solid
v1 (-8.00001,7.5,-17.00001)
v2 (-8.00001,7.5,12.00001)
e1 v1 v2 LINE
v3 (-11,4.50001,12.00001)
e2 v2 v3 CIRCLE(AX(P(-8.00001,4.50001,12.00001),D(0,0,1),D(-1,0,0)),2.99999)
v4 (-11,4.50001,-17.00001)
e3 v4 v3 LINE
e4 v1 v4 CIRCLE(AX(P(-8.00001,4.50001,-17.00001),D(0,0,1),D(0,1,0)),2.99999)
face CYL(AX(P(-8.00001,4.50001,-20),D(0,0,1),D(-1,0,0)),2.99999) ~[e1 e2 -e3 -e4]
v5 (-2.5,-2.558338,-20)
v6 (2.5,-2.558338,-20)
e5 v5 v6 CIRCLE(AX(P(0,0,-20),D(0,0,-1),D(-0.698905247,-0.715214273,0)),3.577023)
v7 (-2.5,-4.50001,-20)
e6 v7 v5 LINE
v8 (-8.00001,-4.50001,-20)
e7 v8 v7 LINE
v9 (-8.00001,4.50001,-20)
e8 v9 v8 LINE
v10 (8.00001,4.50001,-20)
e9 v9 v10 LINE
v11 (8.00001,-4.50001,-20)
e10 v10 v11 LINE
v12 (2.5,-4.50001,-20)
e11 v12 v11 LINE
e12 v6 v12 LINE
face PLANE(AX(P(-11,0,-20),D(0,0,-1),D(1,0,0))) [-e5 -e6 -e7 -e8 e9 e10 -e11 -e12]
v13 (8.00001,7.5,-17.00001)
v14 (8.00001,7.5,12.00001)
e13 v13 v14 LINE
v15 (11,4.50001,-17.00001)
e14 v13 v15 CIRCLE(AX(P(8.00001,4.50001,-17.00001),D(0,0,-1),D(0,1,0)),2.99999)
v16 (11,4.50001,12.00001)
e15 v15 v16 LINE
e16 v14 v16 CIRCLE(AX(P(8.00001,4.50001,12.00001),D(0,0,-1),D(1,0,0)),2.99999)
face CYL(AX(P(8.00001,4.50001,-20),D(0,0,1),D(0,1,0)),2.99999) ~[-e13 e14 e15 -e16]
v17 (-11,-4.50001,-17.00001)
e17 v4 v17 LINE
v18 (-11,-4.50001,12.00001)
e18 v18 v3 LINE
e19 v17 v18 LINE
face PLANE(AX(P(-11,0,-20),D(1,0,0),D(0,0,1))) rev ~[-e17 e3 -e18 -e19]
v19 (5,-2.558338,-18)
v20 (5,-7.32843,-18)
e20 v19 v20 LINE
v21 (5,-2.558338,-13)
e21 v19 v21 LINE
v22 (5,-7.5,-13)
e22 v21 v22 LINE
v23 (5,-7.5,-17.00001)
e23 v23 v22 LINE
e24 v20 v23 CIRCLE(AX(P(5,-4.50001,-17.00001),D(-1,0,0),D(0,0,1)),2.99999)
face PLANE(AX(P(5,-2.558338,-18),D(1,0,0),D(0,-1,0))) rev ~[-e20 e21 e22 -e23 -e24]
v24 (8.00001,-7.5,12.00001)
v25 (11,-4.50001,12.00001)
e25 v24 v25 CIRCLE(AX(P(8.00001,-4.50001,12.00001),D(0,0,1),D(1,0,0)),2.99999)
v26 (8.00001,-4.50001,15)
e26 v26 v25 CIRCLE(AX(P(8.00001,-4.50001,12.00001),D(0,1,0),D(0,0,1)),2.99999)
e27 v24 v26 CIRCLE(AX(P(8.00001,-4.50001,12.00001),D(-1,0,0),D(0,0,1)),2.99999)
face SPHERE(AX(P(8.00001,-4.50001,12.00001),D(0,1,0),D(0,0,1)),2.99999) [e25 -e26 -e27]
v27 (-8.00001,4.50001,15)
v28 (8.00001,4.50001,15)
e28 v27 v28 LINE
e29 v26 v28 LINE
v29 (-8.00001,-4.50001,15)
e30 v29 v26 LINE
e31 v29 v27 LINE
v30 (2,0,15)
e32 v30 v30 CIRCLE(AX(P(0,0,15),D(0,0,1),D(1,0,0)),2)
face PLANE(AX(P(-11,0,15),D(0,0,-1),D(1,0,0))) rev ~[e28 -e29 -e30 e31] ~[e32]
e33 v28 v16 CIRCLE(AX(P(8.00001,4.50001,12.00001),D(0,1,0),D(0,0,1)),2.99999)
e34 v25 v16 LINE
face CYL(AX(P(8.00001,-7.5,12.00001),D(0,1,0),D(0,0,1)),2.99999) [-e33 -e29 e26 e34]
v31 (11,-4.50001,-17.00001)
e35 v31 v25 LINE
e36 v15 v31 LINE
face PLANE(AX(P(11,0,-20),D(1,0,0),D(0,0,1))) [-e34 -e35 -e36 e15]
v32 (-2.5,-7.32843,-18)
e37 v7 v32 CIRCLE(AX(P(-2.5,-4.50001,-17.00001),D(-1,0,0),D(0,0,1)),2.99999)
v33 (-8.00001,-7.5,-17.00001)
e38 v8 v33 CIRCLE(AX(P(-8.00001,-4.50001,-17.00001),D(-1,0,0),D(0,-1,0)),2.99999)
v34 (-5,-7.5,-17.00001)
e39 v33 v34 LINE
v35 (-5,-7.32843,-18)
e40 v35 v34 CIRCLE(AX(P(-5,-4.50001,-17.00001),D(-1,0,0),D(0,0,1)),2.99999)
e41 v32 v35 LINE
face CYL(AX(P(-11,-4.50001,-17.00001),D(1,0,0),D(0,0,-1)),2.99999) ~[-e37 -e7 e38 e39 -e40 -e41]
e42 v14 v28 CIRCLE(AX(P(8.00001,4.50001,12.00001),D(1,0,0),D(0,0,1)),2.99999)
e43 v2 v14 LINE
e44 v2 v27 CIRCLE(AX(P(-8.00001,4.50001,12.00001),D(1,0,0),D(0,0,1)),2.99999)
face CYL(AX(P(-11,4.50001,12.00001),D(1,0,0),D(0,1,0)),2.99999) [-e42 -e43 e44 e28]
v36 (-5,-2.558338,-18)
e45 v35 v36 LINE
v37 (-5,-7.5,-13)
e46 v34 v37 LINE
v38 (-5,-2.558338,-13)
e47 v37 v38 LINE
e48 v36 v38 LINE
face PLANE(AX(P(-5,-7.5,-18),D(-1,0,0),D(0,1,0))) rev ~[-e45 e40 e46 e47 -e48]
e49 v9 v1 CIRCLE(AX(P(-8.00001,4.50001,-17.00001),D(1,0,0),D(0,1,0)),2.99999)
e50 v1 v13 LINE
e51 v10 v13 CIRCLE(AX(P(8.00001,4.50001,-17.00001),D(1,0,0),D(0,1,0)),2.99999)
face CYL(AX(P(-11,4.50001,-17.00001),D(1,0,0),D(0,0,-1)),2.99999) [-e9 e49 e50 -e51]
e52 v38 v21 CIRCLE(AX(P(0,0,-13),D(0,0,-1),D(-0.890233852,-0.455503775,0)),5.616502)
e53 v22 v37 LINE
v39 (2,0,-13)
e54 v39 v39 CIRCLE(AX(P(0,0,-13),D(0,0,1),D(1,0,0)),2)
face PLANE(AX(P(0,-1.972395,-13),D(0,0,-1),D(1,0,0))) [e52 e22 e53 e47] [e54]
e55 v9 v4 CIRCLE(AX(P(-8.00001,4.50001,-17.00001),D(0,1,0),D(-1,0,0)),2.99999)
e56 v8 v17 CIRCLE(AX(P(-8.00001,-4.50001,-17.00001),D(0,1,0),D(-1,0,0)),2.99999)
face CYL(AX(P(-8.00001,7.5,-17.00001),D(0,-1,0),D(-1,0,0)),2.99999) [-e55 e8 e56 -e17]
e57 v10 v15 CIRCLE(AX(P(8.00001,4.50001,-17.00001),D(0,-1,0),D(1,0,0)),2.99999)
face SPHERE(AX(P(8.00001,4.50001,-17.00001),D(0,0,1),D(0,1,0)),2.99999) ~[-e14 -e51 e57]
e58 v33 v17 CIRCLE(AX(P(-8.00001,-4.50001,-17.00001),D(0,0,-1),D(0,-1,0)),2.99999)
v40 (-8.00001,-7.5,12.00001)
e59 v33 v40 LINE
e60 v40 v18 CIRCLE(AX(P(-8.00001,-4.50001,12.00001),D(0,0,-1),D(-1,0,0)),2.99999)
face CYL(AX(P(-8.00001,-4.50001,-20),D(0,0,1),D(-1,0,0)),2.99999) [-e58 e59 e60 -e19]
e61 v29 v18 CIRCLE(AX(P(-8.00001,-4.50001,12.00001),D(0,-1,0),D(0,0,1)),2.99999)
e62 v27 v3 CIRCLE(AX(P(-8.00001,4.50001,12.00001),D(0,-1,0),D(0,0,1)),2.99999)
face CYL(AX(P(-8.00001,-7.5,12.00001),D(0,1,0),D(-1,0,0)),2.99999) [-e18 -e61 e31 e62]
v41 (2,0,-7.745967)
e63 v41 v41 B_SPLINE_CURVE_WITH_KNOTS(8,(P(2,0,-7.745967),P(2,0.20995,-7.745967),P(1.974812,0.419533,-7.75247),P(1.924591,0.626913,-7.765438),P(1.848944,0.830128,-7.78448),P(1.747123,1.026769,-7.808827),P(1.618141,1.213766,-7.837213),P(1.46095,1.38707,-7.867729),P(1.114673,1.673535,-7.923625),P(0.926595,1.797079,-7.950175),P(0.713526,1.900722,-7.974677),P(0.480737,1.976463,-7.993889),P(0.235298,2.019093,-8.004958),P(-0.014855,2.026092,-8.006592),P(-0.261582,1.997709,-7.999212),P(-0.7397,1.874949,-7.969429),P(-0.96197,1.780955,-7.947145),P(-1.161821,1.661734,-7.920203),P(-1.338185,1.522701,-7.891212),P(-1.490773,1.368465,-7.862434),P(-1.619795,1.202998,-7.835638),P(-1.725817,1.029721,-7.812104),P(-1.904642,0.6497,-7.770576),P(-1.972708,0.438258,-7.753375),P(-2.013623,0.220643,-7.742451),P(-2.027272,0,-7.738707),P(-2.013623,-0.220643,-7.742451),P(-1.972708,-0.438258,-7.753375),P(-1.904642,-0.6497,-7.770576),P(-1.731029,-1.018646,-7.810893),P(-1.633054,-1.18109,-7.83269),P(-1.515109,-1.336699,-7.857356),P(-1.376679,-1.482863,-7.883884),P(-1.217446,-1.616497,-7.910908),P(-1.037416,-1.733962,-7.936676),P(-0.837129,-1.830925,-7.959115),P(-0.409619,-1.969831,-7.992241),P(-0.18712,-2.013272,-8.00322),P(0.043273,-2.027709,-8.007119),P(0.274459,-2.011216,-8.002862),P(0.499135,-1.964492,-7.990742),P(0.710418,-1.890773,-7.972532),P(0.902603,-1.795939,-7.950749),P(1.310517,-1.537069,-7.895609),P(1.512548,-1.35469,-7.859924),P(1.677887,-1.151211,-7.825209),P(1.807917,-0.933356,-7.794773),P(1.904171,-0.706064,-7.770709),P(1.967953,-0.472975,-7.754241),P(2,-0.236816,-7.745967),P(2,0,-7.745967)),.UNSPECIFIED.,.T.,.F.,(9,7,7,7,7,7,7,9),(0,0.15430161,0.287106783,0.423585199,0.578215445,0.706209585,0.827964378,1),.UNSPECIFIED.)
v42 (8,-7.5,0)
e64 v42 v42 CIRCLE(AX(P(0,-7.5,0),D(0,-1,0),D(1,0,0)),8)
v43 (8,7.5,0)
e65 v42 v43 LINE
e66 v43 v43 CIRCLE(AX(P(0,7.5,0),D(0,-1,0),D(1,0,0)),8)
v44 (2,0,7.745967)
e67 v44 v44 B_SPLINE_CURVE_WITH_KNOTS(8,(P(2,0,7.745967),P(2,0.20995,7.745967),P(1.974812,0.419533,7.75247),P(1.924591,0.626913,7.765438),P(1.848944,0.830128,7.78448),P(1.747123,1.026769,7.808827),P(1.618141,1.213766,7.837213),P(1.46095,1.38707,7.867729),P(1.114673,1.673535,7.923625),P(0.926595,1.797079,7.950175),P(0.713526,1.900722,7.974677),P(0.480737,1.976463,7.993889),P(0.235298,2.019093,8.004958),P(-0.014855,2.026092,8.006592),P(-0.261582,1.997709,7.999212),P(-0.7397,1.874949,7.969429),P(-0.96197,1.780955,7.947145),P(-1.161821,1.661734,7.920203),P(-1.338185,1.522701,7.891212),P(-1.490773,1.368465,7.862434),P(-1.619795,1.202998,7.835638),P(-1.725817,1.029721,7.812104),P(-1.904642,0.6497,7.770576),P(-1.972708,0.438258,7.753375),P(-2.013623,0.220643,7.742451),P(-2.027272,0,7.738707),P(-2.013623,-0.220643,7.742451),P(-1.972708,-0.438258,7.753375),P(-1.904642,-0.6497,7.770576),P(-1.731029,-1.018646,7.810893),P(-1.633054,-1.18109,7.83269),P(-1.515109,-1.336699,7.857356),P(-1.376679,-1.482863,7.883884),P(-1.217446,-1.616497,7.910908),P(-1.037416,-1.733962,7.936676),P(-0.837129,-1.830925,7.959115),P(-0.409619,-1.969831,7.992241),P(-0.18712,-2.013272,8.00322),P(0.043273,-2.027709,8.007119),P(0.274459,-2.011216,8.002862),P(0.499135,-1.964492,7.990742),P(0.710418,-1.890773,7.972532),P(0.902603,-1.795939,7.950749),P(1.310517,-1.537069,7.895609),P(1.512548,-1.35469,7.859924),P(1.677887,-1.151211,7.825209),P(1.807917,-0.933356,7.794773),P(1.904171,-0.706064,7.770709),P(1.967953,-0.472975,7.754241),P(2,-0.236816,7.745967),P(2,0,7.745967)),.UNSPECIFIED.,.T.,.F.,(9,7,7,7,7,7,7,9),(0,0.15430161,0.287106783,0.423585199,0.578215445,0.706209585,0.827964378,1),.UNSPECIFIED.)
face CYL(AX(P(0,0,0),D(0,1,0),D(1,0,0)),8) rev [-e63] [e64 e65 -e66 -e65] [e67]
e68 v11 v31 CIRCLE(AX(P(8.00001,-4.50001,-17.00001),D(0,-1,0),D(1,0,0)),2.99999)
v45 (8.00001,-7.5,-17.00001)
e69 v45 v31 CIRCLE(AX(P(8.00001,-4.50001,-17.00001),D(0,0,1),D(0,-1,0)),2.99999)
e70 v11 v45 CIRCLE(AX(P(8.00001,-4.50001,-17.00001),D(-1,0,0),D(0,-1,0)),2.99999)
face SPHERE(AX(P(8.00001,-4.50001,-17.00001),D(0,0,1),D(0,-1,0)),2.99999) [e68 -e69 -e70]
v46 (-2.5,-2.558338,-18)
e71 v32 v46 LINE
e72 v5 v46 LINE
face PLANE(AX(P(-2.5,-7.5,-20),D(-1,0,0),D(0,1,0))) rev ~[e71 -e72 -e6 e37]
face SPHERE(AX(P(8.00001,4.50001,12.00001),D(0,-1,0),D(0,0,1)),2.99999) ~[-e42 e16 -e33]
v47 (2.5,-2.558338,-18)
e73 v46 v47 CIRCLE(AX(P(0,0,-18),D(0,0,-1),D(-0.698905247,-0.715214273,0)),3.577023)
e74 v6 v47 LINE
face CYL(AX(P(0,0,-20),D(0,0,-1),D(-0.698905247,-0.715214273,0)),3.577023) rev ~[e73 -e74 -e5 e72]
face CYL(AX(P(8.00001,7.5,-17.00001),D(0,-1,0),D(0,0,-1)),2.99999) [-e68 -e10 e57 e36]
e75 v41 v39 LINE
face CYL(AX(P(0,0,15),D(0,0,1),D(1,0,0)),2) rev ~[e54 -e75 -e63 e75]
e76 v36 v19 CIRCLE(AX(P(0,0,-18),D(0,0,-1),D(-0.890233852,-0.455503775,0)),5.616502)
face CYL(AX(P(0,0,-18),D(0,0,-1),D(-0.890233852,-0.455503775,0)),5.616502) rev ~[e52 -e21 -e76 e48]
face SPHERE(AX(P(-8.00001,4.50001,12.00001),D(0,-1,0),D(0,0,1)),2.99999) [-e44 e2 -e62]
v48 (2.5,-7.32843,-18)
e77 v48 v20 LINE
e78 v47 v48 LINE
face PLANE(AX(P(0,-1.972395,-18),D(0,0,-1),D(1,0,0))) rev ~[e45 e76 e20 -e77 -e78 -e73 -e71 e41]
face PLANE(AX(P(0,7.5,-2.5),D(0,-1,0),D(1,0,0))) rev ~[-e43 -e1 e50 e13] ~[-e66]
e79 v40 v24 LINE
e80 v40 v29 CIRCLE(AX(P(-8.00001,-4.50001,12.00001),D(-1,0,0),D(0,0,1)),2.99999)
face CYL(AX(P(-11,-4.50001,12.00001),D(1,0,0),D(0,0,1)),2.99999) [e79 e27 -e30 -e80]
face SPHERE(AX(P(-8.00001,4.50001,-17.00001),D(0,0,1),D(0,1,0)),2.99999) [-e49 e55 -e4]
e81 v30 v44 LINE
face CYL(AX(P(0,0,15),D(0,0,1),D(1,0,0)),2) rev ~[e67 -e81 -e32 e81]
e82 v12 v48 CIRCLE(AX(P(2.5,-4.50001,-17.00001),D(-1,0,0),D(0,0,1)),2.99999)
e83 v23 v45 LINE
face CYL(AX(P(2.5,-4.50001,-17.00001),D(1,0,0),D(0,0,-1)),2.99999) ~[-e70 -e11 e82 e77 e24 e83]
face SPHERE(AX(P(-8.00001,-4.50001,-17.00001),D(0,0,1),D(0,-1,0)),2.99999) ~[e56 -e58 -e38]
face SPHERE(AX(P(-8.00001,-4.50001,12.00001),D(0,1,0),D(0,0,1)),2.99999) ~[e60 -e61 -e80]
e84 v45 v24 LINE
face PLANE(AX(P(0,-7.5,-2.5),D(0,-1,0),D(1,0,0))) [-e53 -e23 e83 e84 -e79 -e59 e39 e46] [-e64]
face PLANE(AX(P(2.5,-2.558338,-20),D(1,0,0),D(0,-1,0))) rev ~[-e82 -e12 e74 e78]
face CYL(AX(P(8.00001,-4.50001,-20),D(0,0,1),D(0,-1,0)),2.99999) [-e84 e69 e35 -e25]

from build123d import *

# Parameters (mm, degrees)
F0_W     = 22
F0_H     = 35
F0_R     = 8
F1_DEPTH = 7.5
F3_DEPTH = 2
F6_DEPTH = 5
F7_R     = 2
F8_DEPTH = 35.001
F9_R     = 2.99999


# Not quite as in the source:
# - a fillet or chamfer is up to 0.001 mm smaller than in the source, because OpenCascade refuses the exact size


with BuildPart() as f1:
    # F0 (on Front) → F1 (new body, symmetric)
    with BuildSketch(Plane.XZ):
        with Locations((0, -2.5)):
            Rectangle(F0_W, F0_H)
        Circle(F0_R, mode=Mode.SUBTRACT)
    extrude(amount=F1_DEPTH, both=True)

    # F2 (on face) → F3 (cut)
    with BuildSketch(Plane(origin=(0, 0, -20), x_dir=(1, 0, 0), z_dir=(0, 0, -1))):
        with BuildLine():
            Line((2.5, 7.5), (-2.5, 7.5))
            Line((-2.5, 7.5), (-2.5, 2.5583377574))
            ThreePointArc((-2.5, 2.5583377574), (0, -3.5770227957), (2.5, 2.5583377574))
            Line((2.5, 2.5583377574), (2.5, 7.5))
        make_face()
    extrude(amount=-F3_DEPTH, mode=Mode.SUBTRACT)

    # F5 (on offset) → F6 (cut)
    with BuildSketch(Plane(origin=(0, 0, -18), x_dir=(1, 0, 0), z_dir=(0, 0, -1))):
        with BuildLine():
            Line((5, 7.5), (-5, 7.5))
            Line((-5, 7.5), (-5, 2.5583377574))
            ThreePointArc((-5, 2.5583377574), (0, -5.6165017654), (5, 2.5583377574))
            Line((5, 2.5583377574), (5, 7.5))
        make_face()
    extrude(amount=-F6_DEPTH, mode=Mode.SUBTRACT)

    # F7 (on face) → F8 (cut, through all)
    with BuildSketch(Plane.XY.offset(15)):
        Circle(F7_R)
    extrude(amount=-F8_DEPTH, mode=Mode.SUBTRACT)

    # F9 (radius 3 in the source; OpenCascade refuses exactly that, so slightly less here)
    f9_edges = [f1.edges().sort_by_distance(p)[0] for p in [
        (-11, 0, 15),
        (11, 0, 15),
        (0, -7.5, 15),
        (0, 7.5, 15),
        (11, -7.5, -2.5),
        (-11, -7.5, -2.5),
        (-11, 7.5, -2.5),
        (11, 7.5, -2.5),
        (0, 7.5, -20),
        (-6.75, -7.5, -20),
        (6.75, -7.5, -20),
        (-11, 0, -20),
        (11, 0, -20),
    ]]
    fillet(f9_edges, radius=F9_R)


solid = f1.part
